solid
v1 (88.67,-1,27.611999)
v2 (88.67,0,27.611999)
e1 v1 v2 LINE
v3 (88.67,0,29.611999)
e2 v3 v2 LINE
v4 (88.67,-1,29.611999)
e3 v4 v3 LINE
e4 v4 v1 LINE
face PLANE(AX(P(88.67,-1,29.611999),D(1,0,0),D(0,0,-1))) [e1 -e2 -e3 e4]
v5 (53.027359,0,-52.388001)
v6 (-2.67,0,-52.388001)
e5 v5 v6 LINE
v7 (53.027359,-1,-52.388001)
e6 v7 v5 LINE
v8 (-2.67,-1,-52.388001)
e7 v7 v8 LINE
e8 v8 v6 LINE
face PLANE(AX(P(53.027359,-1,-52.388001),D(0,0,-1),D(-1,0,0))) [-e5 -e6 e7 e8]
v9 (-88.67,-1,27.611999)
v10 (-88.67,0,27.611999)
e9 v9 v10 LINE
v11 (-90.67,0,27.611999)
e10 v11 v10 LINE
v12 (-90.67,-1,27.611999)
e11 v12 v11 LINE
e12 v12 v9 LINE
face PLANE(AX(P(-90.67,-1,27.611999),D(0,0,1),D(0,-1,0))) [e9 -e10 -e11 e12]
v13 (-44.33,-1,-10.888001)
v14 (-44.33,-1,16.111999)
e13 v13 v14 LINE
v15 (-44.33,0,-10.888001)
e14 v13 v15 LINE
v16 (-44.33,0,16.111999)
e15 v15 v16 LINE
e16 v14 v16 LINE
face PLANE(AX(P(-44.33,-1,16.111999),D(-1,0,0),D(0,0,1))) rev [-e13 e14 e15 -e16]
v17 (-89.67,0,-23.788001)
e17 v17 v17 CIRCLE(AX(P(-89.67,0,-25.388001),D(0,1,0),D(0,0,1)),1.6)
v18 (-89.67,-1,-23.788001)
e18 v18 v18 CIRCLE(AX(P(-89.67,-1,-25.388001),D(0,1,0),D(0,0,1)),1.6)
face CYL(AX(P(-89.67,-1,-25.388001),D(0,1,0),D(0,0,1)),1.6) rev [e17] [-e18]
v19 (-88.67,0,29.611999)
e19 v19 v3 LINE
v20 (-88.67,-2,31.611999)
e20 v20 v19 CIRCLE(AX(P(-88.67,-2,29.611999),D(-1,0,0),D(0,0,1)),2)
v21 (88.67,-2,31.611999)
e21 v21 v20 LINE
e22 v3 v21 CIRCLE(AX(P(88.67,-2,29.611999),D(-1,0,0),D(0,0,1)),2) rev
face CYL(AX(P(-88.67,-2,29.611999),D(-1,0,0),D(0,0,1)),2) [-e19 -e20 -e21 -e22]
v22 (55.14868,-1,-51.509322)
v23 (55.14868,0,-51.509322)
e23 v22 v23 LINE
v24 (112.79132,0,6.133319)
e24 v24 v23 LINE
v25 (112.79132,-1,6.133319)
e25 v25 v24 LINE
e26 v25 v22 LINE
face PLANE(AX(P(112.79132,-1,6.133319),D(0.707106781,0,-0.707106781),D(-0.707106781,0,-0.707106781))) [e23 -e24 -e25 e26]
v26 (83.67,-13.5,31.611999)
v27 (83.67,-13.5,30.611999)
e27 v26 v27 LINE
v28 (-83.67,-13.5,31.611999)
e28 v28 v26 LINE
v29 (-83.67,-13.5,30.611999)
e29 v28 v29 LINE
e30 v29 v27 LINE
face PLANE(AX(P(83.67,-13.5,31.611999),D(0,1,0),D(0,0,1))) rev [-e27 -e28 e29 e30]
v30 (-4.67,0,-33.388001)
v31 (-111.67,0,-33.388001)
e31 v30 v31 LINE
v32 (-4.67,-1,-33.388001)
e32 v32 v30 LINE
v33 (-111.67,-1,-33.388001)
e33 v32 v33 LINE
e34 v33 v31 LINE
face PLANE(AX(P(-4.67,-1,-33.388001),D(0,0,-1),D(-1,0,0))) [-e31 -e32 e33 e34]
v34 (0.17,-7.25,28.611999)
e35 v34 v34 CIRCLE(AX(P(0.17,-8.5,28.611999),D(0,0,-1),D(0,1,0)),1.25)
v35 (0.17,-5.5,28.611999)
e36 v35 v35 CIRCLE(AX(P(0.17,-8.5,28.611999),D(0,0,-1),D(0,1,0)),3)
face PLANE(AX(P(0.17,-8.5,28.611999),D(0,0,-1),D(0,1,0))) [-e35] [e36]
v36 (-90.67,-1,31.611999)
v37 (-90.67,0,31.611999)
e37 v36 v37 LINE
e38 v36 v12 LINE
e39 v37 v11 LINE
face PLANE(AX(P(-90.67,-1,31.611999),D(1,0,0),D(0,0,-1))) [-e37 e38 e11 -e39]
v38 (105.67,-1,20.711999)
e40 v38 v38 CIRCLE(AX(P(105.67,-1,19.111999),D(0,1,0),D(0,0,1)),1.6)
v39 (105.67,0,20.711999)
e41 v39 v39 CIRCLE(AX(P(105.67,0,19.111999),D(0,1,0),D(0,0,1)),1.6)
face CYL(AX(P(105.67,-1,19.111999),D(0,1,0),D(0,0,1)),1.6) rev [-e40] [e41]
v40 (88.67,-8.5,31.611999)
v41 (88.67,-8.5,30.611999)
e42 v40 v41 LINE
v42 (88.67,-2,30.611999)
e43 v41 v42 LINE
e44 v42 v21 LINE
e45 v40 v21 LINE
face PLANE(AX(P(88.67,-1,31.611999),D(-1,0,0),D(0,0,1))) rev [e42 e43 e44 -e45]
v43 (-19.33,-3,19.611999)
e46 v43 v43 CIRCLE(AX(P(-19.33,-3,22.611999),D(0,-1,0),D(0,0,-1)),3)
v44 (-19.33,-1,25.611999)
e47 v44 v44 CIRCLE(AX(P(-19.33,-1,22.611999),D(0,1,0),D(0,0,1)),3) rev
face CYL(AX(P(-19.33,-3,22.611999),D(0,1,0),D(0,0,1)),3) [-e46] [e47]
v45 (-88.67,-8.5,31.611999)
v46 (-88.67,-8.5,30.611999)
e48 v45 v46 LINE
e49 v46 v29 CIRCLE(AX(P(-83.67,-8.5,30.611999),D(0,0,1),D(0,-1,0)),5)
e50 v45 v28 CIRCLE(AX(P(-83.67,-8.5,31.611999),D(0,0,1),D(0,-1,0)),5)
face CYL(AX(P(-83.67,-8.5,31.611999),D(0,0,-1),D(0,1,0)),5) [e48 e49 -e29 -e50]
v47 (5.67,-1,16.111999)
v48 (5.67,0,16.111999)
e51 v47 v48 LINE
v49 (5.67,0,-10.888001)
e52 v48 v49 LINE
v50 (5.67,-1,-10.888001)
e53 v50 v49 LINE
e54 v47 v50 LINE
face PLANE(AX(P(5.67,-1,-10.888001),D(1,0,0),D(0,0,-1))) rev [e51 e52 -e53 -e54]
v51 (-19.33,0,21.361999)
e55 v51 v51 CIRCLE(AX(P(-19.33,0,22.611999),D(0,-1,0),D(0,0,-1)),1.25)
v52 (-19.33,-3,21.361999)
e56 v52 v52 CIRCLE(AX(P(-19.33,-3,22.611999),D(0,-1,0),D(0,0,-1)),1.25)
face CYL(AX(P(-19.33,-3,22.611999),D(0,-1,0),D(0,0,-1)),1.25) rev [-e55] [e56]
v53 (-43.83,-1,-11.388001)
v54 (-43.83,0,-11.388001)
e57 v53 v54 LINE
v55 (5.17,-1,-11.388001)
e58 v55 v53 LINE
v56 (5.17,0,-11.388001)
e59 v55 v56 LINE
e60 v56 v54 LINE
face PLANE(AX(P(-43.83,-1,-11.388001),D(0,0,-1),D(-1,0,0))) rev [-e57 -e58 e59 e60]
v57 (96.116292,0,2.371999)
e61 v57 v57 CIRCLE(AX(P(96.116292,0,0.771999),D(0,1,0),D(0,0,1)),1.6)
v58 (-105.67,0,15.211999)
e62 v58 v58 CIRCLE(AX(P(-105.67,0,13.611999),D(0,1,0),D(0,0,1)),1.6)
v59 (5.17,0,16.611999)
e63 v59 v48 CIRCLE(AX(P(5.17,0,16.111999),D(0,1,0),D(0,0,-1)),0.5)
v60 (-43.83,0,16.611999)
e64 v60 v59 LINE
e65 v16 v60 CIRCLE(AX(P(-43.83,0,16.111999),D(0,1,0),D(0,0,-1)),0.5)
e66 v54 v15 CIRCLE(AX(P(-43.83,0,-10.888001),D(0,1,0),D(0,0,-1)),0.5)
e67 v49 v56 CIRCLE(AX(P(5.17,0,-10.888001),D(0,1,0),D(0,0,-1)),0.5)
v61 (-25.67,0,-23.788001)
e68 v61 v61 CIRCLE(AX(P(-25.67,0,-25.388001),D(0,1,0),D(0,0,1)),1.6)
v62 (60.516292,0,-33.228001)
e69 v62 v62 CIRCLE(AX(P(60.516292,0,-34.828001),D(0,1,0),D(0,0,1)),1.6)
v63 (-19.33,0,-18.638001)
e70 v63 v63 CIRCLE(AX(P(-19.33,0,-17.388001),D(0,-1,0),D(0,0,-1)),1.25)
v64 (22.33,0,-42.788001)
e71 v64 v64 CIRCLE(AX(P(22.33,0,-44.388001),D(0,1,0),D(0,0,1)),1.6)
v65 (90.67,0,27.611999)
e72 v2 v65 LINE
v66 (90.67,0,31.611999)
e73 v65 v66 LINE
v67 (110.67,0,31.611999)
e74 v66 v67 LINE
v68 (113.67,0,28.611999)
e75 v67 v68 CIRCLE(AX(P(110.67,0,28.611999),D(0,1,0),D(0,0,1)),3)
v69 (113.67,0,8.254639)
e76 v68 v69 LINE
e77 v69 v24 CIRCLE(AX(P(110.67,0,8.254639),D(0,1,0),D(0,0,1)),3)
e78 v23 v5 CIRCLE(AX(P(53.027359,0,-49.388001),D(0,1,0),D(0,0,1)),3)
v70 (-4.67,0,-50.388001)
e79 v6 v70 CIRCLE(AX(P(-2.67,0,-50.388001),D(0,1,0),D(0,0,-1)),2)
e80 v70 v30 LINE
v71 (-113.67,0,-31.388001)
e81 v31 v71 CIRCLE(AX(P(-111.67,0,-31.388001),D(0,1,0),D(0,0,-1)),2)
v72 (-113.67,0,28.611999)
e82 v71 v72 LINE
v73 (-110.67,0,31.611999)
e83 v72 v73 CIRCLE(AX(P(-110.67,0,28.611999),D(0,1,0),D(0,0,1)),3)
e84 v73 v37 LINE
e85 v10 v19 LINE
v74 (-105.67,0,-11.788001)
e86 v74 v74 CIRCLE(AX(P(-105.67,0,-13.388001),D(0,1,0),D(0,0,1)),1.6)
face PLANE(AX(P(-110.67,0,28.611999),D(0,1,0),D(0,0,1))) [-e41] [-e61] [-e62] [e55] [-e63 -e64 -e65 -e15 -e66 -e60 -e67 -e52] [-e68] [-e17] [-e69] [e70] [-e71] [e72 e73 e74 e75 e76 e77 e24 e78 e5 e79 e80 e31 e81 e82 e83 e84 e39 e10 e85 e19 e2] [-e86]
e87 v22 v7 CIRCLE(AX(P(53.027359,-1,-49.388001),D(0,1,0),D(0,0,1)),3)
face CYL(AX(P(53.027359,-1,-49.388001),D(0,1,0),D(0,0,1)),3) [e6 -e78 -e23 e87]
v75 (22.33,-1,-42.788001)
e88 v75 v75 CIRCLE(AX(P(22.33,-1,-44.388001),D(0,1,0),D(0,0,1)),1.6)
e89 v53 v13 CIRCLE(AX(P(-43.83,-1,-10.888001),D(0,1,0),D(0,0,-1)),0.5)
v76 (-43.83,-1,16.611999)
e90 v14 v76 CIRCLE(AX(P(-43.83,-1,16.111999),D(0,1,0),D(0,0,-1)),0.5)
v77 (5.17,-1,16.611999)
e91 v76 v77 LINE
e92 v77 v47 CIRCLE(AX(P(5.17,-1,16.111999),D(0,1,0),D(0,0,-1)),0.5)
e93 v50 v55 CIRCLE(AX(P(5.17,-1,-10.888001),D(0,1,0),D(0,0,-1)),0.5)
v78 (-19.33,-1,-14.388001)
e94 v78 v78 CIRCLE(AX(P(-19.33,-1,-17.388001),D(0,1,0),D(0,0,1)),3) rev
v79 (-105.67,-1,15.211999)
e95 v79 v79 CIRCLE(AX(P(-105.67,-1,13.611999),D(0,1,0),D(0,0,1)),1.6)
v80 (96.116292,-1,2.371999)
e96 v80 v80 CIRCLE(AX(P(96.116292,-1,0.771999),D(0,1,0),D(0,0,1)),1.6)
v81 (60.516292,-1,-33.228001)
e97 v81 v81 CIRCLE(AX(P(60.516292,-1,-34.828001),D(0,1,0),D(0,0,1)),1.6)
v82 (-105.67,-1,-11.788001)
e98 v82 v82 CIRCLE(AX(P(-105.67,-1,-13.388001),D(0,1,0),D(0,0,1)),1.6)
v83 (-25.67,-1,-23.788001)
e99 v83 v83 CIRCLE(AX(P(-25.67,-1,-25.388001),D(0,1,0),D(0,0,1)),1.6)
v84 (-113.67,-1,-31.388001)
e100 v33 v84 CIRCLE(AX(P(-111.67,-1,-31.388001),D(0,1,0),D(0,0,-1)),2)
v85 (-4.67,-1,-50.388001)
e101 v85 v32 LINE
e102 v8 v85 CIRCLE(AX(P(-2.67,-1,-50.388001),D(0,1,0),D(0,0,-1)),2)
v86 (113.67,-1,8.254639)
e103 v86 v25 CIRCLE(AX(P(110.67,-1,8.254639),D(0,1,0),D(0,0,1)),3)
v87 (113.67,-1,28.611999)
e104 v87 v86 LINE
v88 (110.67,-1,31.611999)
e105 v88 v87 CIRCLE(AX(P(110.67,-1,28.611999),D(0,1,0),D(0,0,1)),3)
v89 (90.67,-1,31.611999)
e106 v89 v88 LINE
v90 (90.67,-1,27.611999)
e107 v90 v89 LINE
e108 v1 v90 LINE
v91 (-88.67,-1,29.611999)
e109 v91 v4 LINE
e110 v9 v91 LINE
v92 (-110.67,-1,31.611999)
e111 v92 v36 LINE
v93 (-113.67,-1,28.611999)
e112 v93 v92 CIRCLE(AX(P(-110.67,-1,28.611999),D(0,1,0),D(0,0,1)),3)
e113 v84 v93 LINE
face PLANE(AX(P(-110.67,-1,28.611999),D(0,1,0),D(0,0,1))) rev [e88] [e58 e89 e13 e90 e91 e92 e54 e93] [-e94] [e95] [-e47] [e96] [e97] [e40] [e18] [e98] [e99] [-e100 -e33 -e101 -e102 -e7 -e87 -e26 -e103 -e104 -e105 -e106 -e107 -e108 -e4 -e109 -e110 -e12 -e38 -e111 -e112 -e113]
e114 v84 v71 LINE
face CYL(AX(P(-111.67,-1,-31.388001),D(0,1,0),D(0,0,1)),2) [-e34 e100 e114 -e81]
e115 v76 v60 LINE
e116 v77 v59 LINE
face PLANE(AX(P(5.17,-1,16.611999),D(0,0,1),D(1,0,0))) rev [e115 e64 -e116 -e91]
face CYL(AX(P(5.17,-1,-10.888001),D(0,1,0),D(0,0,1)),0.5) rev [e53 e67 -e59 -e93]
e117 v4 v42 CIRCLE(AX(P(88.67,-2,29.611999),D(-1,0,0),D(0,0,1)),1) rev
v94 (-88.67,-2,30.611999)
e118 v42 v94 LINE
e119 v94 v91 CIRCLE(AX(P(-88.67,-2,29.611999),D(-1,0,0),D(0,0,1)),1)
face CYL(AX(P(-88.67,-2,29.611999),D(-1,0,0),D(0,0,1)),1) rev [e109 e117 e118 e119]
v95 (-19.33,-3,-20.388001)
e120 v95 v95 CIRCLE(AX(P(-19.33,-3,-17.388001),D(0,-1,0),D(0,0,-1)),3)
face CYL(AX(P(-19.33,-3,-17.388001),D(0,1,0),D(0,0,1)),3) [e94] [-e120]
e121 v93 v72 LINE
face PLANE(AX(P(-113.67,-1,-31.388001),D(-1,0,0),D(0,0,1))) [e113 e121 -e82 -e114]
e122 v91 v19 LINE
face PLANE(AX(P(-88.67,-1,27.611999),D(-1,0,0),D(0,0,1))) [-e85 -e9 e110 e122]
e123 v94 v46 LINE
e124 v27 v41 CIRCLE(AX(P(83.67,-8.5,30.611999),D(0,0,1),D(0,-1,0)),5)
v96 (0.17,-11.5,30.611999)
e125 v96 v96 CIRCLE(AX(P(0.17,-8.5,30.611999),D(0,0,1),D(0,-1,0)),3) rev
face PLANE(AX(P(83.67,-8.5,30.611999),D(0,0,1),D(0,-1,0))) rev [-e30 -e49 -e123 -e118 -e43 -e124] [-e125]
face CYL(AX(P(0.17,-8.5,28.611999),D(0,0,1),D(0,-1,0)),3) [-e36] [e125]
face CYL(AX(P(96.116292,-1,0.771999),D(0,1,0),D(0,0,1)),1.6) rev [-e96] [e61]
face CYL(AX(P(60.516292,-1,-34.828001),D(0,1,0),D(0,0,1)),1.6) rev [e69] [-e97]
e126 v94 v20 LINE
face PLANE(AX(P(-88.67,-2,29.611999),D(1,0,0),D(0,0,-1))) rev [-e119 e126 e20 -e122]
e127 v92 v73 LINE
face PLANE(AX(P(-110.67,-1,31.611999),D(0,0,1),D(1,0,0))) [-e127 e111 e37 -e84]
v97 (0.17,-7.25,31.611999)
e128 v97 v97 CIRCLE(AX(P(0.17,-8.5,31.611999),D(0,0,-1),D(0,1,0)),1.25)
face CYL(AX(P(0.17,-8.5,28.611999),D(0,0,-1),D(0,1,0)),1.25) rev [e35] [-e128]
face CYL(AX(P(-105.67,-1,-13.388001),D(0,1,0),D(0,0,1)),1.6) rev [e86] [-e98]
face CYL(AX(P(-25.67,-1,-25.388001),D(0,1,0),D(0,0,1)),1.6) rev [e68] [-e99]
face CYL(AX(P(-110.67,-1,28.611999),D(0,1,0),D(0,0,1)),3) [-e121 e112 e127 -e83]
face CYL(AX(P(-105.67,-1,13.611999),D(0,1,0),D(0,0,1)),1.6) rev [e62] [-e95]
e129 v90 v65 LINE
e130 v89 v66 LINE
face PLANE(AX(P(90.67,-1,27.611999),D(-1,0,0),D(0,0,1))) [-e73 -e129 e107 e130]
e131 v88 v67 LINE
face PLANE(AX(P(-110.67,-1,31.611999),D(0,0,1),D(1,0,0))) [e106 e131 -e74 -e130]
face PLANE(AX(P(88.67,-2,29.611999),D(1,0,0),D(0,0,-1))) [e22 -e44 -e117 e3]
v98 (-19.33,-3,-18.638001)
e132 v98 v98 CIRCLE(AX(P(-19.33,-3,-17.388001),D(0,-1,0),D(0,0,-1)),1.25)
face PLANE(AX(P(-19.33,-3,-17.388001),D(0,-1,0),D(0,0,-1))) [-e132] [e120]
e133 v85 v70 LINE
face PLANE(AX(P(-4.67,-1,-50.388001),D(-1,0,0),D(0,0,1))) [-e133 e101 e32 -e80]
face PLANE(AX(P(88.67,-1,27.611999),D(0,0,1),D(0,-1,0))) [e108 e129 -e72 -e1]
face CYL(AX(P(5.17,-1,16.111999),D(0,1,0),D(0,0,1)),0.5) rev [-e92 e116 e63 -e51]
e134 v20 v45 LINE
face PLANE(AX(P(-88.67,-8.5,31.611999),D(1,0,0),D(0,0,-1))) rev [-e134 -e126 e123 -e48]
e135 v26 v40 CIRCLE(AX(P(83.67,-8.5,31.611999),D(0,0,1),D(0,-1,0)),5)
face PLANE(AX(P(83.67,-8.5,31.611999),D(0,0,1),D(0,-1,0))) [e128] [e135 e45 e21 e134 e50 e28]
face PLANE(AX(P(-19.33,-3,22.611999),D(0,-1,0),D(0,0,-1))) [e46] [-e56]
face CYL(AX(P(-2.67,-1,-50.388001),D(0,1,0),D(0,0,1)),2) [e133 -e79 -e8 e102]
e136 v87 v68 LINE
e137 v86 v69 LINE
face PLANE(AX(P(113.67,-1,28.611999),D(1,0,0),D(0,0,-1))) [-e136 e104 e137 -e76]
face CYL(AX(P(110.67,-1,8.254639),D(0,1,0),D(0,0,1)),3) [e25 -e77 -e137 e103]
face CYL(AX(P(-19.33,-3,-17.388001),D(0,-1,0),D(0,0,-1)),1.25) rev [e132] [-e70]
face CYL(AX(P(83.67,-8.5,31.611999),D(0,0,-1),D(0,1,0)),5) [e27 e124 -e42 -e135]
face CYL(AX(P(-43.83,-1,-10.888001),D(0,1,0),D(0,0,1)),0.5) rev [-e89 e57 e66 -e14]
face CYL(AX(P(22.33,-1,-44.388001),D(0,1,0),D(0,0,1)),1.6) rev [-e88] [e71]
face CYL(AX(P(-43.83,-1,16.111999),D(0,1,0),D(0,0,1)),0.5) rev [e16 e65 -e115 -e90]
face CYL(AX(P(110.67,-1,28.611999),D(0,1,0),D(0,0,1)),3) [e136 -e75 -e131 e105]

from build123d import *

# Parameters (mm, degrees)
SKETCH_1_R                        = 1.6
SM_BASE_FLANGE_1_DEPTH            = 1
SKETCH_2_R                        = 3
EXTRUDE_1_DEPTH                   = 2
HOLE_WIZARD_M3_1_D                = 2.5
SM_EDGE_FLANGE_1_STRIP_W          = 6
SM_EDGE_FLANGE_1_STRIP_H          = 1
SM_EDGE_FLANGE_1_STRIP_CUT_DEPTH  = 177.34
SM_EDGE_FLANGE_1_RELIEF_W         = 8
SM_EDGE_FLANGE_1_RELIEF_H         = 2
SM_EDGE_FLANGE_1_RELIEF_CUT_DEPTH = 1
SM_EDGE_FLANGE_1_DEPTH            = 177.34
SM_EDGE_FLANGE_1_FLAT_DEPTH       = 1
SKETCH_8_R                        = 3
EXTRUDE_2_DEPTH                   = 2
HOLE_WIZARD_M3_2_D                = 2.5


# Sheet-metal steps are written as plain solids
with BuildPart() as part:
    # Sketch 1 → 基体-法兰1 (new body)
    with BuildSketch(Plane(origin=(0, 0, 0), x_dir=(1, 0, 0), z_dir=(0, 1, 0))):
        with BuildLine():
            Line((-113.67, 31.388001247), (-113.67, -28.611998753))
            ThreePointArc((-113.67, -28.611998753), (-112.791320344, -30.733319096), (-110.67, -31.611998753))
            Line((-110.67, -31.611998753), (110.67, -31.611998753))
            ThreePointArc((110.67, -31.611998753), (112.791320344, -30.733319096), (113.67, -28.611998753))
            Line((113.67, -28.611998753), (113.67, -8.25463944))
            ThreePointArc((113.67, -8.25463944), (113.441638598, -7.106589143), (112.791320344, -6.133319096))
            Line((112.791320344, -6.133319096), (55.148679656, 51.509321591))
            ThreePointArc((55.148679656, 51.509321591), (54.17540961, 52.159639845), (53.027359313, 52.388001247))
            Line((53.027359313, 52.388001247), (-2.67, 52.388001247))
            ThreePointArc((-2.67, 52.388001247), (-4.084213562, 51.80221481), (-4.67, 50.388001247))
            Line((-4.67, 50.388001247), (-4.67, 33.388001247))
            Line((-4.67, 33.388001247), (-111.67, 33.388001247))
            ThreePointArc((-111.67, 33.388001247), (-113.084213562, 32.80221481), (-113.67, 31.388001247))
        make_face()
        with Locations(Location((-105.67, -13.611998753, 0), (0, 0, 270))):
            Circle(SKETCH_1_R, mode=Mode.SUBTRACT)
        with Locations(Location((-105.67, 13.388001247, 0), (0, 0, 270))):
            Circle(SKETCH_1_R, mode=Mode.SUBTRACT)
        with Locations(Location((-89.67, 25.388001247, 0), (0, 0, 270))):
            Circle(SKETCH_1_R, mode=Mode.SUBTRACT)
        with Locations(Location((-25.67, 25.388001247, 0), (0, 0, 270))):
            Circle(SKETCH_1_R, mode=Mode.SUBTRACT)
        with Locations(Location((22.33, 44.388001247, 0), (0, 0, 270))):
            Circle(SKETCH_1_R, mode=Mode.SUBTRACT)
        with Locations(Location((60.516291501, 34.828001247, 0), (0, 0, 270))):
            Circle(SKETCH_1_R, mode=Mode.SUBTRACT)
        with Locations(Location((96.116291501, -0.771998753, 0), (0, 0, 270))):
            Circle(SKETCH_1_R, mode=Mode.SUBTRACT)
        with Locations(Location((105.67, -19.111998753, 0), (0, 0, 270))):
            Circle(SKETCH_1_R, mode=Mode.SUBTRACT)
        with BuildLine():
            Line((-43.83, 11.388001247), (5.17, 11.388001247))
            ThreePointArc((5.17, 11.388001247), (5.523553391, 11.241554638), (5.67, 10.888001247))
            Line((5.67, 10.888001247), (5.67, -16.111998753))
            ThreePointArc((5.67, -16.111998753), (5.523553391, -16.465552143), (5.17, -16.611998753))
            Line((5.17, -16.611998753), (-43.83, -16.611998753))
            ThreePointArc((-43.83, -16.611998753), (-44.183553391, -16.465552143), (-44.33, -16.111998753))
            Line((-44.33, -16.111998753), (-44.33, 10.888001247))
            ThreePointArc((-44.33, 10.888001247), (-44.183553391, 11.241554638), (-43.83, 11.388001247))
        make_face(mode=Mode.SUBTRACT)
    extrude(amount=-SM_BASE_FLANGE_1_DEPTH)

    # Sketch 2 → 凸台-拉伸1 (add)
    with BuildSketch(Plane.XZ.offset(1)):
        with Locations(Location((-19.33, -17.388001247, 0), (0, 0, 90))):
            Circle(SKETCH_2_R)
        with Locations(Location((-19.33, 22.611998753, 0), (0, 0, 90))):
            Circle(SKETCH_2_R)
    extrude(amount=EXTRUDE_1_DEPTH)

    # M3 螺纹孔1 (through all)
    with Locations(Plane(origin=(0, -3, 0), x_dir=(-1, 0, 0), z_dir=(0, -1, 0))):
        with Locations((19.33, 17.388001247), (19.33, -22.611998753)):
            Hole(HOLE_WIZARD_M3_1_D / 2)

    # 边线-法兰1 strip (across the edge) → 边线-法兰1 strip cut (cut)
    with BuildSketch(Plane(origin=(88.67, -1, 31.611998753), x_dir=(0, 0, -1), z_dir=(-1, 0, 0))):
        with Locations((-1, -0.5)):
            Rectangle(SM_EDGE_FLANGE_1_STRIP_W, SM_EDGE_FLANGE_1_STRIP_H)
    extrude(amount=SM_EDGE_FLANGE_1_STRIP_CUT_DEPTH, mode=Mode.SUBTRACT)

    # 边线-法兰1 relief (on the sheet) → 边线-法兰1 relief cut (cut)
    with BuildSketch(Plane(origin=(88.67, -1, 29.611998753), x_dir=(0, 0, -1), z_dir=(0, -1, 0))):
        with Locations((-2, 1)):
            Rectangle(SM_EDGE_FLANGE_1_RELIEF_W, SM_EDGE_FLANGE_1_RELIEF_H)
        with Locations((-2, -178.34)):
            Rectangle(SM_EDGE_FLANGE_1_RELIEF_W, SM_EDGE_FLANGE_1_RELIEF_H)
    extrude(amount=-SM_EDGE_FLANGE_1_RELIEF_CUT_DEPTH, mode=Mode.SUBTRACT)

    # 边线-法兰1 bend section (across the edge) → 边线-法兰1 (add)
    with BuildSketch(Plane(origin=(88.67, -1, 31.611998753), x_dir=(0, 0, -1), z_dir=(-1, 0, 0))):
        with BuildLine():
            Line((0, 1), (1, 1))
            ThreePointArc((1, 1), (1.292893219, 0.292893219), (2, 0))
            Line((2, 0), (2, -1))
            ThreePointArc((2, -1), (0.585786438, -0.414213562), (0, 1))
        make_face()
    extrude(amount=SM_EDGE_FLANGE_1_DEPTH)

    # 边线-法兰1 profile (on flange) → 边线-法兰1 flat (add)
    with BuildSketch(Plane(origin=(0, -1, 31.611998753), x_dir=(-1, 0, 0), z_dir=(0, 0, 1))):
        with BuildLine():
            Line((83.67, 12.5), (-83.67, 12.5))
            ThreePointArc((-83.67, 12.5), (-87.205533906, 11.035533906), (-88.67, 7.5))
            Line((-88.67, 7.5), (-88.67, 1))
            Line((-88.67, 1), (88.67, 1))
            Line((88.67, 1), (88.67, 7.5))
            ThreePointArc((88.67, 7.5), (87.205533906, 11.035533906), (83.67, 12.5))
        make_face()
    extrude(amount=-SM_EDGE_FLANGE_1_FLAT_DEPTH)

    # 草图8 → 凸台-拉伸2 (add)
    with BuildSketch(Plane(origin=(0, 0, 30.611998753), x_dir=(-1, 0, 0), z_dir=(0, 0, -1))):
        with Locations(Location((-0.17, -8.5, 0), (0, 0, 270))):
            Circle(SKETCH_8_R)
    extrude(amount=EXTRUDE_2_DEPTH)

    # M3 螺纹孔2 (through all)
    with Locations(Plane(origin=(0, 0, 28.611998753), x_dir=(-1, 0, 0), z_dir=(0, 0, -1))):
        with Locations((-0.17, -8.5)):
            Hole(HOLE_WIZARD_M3_2_D / 2)


solid = part.part
